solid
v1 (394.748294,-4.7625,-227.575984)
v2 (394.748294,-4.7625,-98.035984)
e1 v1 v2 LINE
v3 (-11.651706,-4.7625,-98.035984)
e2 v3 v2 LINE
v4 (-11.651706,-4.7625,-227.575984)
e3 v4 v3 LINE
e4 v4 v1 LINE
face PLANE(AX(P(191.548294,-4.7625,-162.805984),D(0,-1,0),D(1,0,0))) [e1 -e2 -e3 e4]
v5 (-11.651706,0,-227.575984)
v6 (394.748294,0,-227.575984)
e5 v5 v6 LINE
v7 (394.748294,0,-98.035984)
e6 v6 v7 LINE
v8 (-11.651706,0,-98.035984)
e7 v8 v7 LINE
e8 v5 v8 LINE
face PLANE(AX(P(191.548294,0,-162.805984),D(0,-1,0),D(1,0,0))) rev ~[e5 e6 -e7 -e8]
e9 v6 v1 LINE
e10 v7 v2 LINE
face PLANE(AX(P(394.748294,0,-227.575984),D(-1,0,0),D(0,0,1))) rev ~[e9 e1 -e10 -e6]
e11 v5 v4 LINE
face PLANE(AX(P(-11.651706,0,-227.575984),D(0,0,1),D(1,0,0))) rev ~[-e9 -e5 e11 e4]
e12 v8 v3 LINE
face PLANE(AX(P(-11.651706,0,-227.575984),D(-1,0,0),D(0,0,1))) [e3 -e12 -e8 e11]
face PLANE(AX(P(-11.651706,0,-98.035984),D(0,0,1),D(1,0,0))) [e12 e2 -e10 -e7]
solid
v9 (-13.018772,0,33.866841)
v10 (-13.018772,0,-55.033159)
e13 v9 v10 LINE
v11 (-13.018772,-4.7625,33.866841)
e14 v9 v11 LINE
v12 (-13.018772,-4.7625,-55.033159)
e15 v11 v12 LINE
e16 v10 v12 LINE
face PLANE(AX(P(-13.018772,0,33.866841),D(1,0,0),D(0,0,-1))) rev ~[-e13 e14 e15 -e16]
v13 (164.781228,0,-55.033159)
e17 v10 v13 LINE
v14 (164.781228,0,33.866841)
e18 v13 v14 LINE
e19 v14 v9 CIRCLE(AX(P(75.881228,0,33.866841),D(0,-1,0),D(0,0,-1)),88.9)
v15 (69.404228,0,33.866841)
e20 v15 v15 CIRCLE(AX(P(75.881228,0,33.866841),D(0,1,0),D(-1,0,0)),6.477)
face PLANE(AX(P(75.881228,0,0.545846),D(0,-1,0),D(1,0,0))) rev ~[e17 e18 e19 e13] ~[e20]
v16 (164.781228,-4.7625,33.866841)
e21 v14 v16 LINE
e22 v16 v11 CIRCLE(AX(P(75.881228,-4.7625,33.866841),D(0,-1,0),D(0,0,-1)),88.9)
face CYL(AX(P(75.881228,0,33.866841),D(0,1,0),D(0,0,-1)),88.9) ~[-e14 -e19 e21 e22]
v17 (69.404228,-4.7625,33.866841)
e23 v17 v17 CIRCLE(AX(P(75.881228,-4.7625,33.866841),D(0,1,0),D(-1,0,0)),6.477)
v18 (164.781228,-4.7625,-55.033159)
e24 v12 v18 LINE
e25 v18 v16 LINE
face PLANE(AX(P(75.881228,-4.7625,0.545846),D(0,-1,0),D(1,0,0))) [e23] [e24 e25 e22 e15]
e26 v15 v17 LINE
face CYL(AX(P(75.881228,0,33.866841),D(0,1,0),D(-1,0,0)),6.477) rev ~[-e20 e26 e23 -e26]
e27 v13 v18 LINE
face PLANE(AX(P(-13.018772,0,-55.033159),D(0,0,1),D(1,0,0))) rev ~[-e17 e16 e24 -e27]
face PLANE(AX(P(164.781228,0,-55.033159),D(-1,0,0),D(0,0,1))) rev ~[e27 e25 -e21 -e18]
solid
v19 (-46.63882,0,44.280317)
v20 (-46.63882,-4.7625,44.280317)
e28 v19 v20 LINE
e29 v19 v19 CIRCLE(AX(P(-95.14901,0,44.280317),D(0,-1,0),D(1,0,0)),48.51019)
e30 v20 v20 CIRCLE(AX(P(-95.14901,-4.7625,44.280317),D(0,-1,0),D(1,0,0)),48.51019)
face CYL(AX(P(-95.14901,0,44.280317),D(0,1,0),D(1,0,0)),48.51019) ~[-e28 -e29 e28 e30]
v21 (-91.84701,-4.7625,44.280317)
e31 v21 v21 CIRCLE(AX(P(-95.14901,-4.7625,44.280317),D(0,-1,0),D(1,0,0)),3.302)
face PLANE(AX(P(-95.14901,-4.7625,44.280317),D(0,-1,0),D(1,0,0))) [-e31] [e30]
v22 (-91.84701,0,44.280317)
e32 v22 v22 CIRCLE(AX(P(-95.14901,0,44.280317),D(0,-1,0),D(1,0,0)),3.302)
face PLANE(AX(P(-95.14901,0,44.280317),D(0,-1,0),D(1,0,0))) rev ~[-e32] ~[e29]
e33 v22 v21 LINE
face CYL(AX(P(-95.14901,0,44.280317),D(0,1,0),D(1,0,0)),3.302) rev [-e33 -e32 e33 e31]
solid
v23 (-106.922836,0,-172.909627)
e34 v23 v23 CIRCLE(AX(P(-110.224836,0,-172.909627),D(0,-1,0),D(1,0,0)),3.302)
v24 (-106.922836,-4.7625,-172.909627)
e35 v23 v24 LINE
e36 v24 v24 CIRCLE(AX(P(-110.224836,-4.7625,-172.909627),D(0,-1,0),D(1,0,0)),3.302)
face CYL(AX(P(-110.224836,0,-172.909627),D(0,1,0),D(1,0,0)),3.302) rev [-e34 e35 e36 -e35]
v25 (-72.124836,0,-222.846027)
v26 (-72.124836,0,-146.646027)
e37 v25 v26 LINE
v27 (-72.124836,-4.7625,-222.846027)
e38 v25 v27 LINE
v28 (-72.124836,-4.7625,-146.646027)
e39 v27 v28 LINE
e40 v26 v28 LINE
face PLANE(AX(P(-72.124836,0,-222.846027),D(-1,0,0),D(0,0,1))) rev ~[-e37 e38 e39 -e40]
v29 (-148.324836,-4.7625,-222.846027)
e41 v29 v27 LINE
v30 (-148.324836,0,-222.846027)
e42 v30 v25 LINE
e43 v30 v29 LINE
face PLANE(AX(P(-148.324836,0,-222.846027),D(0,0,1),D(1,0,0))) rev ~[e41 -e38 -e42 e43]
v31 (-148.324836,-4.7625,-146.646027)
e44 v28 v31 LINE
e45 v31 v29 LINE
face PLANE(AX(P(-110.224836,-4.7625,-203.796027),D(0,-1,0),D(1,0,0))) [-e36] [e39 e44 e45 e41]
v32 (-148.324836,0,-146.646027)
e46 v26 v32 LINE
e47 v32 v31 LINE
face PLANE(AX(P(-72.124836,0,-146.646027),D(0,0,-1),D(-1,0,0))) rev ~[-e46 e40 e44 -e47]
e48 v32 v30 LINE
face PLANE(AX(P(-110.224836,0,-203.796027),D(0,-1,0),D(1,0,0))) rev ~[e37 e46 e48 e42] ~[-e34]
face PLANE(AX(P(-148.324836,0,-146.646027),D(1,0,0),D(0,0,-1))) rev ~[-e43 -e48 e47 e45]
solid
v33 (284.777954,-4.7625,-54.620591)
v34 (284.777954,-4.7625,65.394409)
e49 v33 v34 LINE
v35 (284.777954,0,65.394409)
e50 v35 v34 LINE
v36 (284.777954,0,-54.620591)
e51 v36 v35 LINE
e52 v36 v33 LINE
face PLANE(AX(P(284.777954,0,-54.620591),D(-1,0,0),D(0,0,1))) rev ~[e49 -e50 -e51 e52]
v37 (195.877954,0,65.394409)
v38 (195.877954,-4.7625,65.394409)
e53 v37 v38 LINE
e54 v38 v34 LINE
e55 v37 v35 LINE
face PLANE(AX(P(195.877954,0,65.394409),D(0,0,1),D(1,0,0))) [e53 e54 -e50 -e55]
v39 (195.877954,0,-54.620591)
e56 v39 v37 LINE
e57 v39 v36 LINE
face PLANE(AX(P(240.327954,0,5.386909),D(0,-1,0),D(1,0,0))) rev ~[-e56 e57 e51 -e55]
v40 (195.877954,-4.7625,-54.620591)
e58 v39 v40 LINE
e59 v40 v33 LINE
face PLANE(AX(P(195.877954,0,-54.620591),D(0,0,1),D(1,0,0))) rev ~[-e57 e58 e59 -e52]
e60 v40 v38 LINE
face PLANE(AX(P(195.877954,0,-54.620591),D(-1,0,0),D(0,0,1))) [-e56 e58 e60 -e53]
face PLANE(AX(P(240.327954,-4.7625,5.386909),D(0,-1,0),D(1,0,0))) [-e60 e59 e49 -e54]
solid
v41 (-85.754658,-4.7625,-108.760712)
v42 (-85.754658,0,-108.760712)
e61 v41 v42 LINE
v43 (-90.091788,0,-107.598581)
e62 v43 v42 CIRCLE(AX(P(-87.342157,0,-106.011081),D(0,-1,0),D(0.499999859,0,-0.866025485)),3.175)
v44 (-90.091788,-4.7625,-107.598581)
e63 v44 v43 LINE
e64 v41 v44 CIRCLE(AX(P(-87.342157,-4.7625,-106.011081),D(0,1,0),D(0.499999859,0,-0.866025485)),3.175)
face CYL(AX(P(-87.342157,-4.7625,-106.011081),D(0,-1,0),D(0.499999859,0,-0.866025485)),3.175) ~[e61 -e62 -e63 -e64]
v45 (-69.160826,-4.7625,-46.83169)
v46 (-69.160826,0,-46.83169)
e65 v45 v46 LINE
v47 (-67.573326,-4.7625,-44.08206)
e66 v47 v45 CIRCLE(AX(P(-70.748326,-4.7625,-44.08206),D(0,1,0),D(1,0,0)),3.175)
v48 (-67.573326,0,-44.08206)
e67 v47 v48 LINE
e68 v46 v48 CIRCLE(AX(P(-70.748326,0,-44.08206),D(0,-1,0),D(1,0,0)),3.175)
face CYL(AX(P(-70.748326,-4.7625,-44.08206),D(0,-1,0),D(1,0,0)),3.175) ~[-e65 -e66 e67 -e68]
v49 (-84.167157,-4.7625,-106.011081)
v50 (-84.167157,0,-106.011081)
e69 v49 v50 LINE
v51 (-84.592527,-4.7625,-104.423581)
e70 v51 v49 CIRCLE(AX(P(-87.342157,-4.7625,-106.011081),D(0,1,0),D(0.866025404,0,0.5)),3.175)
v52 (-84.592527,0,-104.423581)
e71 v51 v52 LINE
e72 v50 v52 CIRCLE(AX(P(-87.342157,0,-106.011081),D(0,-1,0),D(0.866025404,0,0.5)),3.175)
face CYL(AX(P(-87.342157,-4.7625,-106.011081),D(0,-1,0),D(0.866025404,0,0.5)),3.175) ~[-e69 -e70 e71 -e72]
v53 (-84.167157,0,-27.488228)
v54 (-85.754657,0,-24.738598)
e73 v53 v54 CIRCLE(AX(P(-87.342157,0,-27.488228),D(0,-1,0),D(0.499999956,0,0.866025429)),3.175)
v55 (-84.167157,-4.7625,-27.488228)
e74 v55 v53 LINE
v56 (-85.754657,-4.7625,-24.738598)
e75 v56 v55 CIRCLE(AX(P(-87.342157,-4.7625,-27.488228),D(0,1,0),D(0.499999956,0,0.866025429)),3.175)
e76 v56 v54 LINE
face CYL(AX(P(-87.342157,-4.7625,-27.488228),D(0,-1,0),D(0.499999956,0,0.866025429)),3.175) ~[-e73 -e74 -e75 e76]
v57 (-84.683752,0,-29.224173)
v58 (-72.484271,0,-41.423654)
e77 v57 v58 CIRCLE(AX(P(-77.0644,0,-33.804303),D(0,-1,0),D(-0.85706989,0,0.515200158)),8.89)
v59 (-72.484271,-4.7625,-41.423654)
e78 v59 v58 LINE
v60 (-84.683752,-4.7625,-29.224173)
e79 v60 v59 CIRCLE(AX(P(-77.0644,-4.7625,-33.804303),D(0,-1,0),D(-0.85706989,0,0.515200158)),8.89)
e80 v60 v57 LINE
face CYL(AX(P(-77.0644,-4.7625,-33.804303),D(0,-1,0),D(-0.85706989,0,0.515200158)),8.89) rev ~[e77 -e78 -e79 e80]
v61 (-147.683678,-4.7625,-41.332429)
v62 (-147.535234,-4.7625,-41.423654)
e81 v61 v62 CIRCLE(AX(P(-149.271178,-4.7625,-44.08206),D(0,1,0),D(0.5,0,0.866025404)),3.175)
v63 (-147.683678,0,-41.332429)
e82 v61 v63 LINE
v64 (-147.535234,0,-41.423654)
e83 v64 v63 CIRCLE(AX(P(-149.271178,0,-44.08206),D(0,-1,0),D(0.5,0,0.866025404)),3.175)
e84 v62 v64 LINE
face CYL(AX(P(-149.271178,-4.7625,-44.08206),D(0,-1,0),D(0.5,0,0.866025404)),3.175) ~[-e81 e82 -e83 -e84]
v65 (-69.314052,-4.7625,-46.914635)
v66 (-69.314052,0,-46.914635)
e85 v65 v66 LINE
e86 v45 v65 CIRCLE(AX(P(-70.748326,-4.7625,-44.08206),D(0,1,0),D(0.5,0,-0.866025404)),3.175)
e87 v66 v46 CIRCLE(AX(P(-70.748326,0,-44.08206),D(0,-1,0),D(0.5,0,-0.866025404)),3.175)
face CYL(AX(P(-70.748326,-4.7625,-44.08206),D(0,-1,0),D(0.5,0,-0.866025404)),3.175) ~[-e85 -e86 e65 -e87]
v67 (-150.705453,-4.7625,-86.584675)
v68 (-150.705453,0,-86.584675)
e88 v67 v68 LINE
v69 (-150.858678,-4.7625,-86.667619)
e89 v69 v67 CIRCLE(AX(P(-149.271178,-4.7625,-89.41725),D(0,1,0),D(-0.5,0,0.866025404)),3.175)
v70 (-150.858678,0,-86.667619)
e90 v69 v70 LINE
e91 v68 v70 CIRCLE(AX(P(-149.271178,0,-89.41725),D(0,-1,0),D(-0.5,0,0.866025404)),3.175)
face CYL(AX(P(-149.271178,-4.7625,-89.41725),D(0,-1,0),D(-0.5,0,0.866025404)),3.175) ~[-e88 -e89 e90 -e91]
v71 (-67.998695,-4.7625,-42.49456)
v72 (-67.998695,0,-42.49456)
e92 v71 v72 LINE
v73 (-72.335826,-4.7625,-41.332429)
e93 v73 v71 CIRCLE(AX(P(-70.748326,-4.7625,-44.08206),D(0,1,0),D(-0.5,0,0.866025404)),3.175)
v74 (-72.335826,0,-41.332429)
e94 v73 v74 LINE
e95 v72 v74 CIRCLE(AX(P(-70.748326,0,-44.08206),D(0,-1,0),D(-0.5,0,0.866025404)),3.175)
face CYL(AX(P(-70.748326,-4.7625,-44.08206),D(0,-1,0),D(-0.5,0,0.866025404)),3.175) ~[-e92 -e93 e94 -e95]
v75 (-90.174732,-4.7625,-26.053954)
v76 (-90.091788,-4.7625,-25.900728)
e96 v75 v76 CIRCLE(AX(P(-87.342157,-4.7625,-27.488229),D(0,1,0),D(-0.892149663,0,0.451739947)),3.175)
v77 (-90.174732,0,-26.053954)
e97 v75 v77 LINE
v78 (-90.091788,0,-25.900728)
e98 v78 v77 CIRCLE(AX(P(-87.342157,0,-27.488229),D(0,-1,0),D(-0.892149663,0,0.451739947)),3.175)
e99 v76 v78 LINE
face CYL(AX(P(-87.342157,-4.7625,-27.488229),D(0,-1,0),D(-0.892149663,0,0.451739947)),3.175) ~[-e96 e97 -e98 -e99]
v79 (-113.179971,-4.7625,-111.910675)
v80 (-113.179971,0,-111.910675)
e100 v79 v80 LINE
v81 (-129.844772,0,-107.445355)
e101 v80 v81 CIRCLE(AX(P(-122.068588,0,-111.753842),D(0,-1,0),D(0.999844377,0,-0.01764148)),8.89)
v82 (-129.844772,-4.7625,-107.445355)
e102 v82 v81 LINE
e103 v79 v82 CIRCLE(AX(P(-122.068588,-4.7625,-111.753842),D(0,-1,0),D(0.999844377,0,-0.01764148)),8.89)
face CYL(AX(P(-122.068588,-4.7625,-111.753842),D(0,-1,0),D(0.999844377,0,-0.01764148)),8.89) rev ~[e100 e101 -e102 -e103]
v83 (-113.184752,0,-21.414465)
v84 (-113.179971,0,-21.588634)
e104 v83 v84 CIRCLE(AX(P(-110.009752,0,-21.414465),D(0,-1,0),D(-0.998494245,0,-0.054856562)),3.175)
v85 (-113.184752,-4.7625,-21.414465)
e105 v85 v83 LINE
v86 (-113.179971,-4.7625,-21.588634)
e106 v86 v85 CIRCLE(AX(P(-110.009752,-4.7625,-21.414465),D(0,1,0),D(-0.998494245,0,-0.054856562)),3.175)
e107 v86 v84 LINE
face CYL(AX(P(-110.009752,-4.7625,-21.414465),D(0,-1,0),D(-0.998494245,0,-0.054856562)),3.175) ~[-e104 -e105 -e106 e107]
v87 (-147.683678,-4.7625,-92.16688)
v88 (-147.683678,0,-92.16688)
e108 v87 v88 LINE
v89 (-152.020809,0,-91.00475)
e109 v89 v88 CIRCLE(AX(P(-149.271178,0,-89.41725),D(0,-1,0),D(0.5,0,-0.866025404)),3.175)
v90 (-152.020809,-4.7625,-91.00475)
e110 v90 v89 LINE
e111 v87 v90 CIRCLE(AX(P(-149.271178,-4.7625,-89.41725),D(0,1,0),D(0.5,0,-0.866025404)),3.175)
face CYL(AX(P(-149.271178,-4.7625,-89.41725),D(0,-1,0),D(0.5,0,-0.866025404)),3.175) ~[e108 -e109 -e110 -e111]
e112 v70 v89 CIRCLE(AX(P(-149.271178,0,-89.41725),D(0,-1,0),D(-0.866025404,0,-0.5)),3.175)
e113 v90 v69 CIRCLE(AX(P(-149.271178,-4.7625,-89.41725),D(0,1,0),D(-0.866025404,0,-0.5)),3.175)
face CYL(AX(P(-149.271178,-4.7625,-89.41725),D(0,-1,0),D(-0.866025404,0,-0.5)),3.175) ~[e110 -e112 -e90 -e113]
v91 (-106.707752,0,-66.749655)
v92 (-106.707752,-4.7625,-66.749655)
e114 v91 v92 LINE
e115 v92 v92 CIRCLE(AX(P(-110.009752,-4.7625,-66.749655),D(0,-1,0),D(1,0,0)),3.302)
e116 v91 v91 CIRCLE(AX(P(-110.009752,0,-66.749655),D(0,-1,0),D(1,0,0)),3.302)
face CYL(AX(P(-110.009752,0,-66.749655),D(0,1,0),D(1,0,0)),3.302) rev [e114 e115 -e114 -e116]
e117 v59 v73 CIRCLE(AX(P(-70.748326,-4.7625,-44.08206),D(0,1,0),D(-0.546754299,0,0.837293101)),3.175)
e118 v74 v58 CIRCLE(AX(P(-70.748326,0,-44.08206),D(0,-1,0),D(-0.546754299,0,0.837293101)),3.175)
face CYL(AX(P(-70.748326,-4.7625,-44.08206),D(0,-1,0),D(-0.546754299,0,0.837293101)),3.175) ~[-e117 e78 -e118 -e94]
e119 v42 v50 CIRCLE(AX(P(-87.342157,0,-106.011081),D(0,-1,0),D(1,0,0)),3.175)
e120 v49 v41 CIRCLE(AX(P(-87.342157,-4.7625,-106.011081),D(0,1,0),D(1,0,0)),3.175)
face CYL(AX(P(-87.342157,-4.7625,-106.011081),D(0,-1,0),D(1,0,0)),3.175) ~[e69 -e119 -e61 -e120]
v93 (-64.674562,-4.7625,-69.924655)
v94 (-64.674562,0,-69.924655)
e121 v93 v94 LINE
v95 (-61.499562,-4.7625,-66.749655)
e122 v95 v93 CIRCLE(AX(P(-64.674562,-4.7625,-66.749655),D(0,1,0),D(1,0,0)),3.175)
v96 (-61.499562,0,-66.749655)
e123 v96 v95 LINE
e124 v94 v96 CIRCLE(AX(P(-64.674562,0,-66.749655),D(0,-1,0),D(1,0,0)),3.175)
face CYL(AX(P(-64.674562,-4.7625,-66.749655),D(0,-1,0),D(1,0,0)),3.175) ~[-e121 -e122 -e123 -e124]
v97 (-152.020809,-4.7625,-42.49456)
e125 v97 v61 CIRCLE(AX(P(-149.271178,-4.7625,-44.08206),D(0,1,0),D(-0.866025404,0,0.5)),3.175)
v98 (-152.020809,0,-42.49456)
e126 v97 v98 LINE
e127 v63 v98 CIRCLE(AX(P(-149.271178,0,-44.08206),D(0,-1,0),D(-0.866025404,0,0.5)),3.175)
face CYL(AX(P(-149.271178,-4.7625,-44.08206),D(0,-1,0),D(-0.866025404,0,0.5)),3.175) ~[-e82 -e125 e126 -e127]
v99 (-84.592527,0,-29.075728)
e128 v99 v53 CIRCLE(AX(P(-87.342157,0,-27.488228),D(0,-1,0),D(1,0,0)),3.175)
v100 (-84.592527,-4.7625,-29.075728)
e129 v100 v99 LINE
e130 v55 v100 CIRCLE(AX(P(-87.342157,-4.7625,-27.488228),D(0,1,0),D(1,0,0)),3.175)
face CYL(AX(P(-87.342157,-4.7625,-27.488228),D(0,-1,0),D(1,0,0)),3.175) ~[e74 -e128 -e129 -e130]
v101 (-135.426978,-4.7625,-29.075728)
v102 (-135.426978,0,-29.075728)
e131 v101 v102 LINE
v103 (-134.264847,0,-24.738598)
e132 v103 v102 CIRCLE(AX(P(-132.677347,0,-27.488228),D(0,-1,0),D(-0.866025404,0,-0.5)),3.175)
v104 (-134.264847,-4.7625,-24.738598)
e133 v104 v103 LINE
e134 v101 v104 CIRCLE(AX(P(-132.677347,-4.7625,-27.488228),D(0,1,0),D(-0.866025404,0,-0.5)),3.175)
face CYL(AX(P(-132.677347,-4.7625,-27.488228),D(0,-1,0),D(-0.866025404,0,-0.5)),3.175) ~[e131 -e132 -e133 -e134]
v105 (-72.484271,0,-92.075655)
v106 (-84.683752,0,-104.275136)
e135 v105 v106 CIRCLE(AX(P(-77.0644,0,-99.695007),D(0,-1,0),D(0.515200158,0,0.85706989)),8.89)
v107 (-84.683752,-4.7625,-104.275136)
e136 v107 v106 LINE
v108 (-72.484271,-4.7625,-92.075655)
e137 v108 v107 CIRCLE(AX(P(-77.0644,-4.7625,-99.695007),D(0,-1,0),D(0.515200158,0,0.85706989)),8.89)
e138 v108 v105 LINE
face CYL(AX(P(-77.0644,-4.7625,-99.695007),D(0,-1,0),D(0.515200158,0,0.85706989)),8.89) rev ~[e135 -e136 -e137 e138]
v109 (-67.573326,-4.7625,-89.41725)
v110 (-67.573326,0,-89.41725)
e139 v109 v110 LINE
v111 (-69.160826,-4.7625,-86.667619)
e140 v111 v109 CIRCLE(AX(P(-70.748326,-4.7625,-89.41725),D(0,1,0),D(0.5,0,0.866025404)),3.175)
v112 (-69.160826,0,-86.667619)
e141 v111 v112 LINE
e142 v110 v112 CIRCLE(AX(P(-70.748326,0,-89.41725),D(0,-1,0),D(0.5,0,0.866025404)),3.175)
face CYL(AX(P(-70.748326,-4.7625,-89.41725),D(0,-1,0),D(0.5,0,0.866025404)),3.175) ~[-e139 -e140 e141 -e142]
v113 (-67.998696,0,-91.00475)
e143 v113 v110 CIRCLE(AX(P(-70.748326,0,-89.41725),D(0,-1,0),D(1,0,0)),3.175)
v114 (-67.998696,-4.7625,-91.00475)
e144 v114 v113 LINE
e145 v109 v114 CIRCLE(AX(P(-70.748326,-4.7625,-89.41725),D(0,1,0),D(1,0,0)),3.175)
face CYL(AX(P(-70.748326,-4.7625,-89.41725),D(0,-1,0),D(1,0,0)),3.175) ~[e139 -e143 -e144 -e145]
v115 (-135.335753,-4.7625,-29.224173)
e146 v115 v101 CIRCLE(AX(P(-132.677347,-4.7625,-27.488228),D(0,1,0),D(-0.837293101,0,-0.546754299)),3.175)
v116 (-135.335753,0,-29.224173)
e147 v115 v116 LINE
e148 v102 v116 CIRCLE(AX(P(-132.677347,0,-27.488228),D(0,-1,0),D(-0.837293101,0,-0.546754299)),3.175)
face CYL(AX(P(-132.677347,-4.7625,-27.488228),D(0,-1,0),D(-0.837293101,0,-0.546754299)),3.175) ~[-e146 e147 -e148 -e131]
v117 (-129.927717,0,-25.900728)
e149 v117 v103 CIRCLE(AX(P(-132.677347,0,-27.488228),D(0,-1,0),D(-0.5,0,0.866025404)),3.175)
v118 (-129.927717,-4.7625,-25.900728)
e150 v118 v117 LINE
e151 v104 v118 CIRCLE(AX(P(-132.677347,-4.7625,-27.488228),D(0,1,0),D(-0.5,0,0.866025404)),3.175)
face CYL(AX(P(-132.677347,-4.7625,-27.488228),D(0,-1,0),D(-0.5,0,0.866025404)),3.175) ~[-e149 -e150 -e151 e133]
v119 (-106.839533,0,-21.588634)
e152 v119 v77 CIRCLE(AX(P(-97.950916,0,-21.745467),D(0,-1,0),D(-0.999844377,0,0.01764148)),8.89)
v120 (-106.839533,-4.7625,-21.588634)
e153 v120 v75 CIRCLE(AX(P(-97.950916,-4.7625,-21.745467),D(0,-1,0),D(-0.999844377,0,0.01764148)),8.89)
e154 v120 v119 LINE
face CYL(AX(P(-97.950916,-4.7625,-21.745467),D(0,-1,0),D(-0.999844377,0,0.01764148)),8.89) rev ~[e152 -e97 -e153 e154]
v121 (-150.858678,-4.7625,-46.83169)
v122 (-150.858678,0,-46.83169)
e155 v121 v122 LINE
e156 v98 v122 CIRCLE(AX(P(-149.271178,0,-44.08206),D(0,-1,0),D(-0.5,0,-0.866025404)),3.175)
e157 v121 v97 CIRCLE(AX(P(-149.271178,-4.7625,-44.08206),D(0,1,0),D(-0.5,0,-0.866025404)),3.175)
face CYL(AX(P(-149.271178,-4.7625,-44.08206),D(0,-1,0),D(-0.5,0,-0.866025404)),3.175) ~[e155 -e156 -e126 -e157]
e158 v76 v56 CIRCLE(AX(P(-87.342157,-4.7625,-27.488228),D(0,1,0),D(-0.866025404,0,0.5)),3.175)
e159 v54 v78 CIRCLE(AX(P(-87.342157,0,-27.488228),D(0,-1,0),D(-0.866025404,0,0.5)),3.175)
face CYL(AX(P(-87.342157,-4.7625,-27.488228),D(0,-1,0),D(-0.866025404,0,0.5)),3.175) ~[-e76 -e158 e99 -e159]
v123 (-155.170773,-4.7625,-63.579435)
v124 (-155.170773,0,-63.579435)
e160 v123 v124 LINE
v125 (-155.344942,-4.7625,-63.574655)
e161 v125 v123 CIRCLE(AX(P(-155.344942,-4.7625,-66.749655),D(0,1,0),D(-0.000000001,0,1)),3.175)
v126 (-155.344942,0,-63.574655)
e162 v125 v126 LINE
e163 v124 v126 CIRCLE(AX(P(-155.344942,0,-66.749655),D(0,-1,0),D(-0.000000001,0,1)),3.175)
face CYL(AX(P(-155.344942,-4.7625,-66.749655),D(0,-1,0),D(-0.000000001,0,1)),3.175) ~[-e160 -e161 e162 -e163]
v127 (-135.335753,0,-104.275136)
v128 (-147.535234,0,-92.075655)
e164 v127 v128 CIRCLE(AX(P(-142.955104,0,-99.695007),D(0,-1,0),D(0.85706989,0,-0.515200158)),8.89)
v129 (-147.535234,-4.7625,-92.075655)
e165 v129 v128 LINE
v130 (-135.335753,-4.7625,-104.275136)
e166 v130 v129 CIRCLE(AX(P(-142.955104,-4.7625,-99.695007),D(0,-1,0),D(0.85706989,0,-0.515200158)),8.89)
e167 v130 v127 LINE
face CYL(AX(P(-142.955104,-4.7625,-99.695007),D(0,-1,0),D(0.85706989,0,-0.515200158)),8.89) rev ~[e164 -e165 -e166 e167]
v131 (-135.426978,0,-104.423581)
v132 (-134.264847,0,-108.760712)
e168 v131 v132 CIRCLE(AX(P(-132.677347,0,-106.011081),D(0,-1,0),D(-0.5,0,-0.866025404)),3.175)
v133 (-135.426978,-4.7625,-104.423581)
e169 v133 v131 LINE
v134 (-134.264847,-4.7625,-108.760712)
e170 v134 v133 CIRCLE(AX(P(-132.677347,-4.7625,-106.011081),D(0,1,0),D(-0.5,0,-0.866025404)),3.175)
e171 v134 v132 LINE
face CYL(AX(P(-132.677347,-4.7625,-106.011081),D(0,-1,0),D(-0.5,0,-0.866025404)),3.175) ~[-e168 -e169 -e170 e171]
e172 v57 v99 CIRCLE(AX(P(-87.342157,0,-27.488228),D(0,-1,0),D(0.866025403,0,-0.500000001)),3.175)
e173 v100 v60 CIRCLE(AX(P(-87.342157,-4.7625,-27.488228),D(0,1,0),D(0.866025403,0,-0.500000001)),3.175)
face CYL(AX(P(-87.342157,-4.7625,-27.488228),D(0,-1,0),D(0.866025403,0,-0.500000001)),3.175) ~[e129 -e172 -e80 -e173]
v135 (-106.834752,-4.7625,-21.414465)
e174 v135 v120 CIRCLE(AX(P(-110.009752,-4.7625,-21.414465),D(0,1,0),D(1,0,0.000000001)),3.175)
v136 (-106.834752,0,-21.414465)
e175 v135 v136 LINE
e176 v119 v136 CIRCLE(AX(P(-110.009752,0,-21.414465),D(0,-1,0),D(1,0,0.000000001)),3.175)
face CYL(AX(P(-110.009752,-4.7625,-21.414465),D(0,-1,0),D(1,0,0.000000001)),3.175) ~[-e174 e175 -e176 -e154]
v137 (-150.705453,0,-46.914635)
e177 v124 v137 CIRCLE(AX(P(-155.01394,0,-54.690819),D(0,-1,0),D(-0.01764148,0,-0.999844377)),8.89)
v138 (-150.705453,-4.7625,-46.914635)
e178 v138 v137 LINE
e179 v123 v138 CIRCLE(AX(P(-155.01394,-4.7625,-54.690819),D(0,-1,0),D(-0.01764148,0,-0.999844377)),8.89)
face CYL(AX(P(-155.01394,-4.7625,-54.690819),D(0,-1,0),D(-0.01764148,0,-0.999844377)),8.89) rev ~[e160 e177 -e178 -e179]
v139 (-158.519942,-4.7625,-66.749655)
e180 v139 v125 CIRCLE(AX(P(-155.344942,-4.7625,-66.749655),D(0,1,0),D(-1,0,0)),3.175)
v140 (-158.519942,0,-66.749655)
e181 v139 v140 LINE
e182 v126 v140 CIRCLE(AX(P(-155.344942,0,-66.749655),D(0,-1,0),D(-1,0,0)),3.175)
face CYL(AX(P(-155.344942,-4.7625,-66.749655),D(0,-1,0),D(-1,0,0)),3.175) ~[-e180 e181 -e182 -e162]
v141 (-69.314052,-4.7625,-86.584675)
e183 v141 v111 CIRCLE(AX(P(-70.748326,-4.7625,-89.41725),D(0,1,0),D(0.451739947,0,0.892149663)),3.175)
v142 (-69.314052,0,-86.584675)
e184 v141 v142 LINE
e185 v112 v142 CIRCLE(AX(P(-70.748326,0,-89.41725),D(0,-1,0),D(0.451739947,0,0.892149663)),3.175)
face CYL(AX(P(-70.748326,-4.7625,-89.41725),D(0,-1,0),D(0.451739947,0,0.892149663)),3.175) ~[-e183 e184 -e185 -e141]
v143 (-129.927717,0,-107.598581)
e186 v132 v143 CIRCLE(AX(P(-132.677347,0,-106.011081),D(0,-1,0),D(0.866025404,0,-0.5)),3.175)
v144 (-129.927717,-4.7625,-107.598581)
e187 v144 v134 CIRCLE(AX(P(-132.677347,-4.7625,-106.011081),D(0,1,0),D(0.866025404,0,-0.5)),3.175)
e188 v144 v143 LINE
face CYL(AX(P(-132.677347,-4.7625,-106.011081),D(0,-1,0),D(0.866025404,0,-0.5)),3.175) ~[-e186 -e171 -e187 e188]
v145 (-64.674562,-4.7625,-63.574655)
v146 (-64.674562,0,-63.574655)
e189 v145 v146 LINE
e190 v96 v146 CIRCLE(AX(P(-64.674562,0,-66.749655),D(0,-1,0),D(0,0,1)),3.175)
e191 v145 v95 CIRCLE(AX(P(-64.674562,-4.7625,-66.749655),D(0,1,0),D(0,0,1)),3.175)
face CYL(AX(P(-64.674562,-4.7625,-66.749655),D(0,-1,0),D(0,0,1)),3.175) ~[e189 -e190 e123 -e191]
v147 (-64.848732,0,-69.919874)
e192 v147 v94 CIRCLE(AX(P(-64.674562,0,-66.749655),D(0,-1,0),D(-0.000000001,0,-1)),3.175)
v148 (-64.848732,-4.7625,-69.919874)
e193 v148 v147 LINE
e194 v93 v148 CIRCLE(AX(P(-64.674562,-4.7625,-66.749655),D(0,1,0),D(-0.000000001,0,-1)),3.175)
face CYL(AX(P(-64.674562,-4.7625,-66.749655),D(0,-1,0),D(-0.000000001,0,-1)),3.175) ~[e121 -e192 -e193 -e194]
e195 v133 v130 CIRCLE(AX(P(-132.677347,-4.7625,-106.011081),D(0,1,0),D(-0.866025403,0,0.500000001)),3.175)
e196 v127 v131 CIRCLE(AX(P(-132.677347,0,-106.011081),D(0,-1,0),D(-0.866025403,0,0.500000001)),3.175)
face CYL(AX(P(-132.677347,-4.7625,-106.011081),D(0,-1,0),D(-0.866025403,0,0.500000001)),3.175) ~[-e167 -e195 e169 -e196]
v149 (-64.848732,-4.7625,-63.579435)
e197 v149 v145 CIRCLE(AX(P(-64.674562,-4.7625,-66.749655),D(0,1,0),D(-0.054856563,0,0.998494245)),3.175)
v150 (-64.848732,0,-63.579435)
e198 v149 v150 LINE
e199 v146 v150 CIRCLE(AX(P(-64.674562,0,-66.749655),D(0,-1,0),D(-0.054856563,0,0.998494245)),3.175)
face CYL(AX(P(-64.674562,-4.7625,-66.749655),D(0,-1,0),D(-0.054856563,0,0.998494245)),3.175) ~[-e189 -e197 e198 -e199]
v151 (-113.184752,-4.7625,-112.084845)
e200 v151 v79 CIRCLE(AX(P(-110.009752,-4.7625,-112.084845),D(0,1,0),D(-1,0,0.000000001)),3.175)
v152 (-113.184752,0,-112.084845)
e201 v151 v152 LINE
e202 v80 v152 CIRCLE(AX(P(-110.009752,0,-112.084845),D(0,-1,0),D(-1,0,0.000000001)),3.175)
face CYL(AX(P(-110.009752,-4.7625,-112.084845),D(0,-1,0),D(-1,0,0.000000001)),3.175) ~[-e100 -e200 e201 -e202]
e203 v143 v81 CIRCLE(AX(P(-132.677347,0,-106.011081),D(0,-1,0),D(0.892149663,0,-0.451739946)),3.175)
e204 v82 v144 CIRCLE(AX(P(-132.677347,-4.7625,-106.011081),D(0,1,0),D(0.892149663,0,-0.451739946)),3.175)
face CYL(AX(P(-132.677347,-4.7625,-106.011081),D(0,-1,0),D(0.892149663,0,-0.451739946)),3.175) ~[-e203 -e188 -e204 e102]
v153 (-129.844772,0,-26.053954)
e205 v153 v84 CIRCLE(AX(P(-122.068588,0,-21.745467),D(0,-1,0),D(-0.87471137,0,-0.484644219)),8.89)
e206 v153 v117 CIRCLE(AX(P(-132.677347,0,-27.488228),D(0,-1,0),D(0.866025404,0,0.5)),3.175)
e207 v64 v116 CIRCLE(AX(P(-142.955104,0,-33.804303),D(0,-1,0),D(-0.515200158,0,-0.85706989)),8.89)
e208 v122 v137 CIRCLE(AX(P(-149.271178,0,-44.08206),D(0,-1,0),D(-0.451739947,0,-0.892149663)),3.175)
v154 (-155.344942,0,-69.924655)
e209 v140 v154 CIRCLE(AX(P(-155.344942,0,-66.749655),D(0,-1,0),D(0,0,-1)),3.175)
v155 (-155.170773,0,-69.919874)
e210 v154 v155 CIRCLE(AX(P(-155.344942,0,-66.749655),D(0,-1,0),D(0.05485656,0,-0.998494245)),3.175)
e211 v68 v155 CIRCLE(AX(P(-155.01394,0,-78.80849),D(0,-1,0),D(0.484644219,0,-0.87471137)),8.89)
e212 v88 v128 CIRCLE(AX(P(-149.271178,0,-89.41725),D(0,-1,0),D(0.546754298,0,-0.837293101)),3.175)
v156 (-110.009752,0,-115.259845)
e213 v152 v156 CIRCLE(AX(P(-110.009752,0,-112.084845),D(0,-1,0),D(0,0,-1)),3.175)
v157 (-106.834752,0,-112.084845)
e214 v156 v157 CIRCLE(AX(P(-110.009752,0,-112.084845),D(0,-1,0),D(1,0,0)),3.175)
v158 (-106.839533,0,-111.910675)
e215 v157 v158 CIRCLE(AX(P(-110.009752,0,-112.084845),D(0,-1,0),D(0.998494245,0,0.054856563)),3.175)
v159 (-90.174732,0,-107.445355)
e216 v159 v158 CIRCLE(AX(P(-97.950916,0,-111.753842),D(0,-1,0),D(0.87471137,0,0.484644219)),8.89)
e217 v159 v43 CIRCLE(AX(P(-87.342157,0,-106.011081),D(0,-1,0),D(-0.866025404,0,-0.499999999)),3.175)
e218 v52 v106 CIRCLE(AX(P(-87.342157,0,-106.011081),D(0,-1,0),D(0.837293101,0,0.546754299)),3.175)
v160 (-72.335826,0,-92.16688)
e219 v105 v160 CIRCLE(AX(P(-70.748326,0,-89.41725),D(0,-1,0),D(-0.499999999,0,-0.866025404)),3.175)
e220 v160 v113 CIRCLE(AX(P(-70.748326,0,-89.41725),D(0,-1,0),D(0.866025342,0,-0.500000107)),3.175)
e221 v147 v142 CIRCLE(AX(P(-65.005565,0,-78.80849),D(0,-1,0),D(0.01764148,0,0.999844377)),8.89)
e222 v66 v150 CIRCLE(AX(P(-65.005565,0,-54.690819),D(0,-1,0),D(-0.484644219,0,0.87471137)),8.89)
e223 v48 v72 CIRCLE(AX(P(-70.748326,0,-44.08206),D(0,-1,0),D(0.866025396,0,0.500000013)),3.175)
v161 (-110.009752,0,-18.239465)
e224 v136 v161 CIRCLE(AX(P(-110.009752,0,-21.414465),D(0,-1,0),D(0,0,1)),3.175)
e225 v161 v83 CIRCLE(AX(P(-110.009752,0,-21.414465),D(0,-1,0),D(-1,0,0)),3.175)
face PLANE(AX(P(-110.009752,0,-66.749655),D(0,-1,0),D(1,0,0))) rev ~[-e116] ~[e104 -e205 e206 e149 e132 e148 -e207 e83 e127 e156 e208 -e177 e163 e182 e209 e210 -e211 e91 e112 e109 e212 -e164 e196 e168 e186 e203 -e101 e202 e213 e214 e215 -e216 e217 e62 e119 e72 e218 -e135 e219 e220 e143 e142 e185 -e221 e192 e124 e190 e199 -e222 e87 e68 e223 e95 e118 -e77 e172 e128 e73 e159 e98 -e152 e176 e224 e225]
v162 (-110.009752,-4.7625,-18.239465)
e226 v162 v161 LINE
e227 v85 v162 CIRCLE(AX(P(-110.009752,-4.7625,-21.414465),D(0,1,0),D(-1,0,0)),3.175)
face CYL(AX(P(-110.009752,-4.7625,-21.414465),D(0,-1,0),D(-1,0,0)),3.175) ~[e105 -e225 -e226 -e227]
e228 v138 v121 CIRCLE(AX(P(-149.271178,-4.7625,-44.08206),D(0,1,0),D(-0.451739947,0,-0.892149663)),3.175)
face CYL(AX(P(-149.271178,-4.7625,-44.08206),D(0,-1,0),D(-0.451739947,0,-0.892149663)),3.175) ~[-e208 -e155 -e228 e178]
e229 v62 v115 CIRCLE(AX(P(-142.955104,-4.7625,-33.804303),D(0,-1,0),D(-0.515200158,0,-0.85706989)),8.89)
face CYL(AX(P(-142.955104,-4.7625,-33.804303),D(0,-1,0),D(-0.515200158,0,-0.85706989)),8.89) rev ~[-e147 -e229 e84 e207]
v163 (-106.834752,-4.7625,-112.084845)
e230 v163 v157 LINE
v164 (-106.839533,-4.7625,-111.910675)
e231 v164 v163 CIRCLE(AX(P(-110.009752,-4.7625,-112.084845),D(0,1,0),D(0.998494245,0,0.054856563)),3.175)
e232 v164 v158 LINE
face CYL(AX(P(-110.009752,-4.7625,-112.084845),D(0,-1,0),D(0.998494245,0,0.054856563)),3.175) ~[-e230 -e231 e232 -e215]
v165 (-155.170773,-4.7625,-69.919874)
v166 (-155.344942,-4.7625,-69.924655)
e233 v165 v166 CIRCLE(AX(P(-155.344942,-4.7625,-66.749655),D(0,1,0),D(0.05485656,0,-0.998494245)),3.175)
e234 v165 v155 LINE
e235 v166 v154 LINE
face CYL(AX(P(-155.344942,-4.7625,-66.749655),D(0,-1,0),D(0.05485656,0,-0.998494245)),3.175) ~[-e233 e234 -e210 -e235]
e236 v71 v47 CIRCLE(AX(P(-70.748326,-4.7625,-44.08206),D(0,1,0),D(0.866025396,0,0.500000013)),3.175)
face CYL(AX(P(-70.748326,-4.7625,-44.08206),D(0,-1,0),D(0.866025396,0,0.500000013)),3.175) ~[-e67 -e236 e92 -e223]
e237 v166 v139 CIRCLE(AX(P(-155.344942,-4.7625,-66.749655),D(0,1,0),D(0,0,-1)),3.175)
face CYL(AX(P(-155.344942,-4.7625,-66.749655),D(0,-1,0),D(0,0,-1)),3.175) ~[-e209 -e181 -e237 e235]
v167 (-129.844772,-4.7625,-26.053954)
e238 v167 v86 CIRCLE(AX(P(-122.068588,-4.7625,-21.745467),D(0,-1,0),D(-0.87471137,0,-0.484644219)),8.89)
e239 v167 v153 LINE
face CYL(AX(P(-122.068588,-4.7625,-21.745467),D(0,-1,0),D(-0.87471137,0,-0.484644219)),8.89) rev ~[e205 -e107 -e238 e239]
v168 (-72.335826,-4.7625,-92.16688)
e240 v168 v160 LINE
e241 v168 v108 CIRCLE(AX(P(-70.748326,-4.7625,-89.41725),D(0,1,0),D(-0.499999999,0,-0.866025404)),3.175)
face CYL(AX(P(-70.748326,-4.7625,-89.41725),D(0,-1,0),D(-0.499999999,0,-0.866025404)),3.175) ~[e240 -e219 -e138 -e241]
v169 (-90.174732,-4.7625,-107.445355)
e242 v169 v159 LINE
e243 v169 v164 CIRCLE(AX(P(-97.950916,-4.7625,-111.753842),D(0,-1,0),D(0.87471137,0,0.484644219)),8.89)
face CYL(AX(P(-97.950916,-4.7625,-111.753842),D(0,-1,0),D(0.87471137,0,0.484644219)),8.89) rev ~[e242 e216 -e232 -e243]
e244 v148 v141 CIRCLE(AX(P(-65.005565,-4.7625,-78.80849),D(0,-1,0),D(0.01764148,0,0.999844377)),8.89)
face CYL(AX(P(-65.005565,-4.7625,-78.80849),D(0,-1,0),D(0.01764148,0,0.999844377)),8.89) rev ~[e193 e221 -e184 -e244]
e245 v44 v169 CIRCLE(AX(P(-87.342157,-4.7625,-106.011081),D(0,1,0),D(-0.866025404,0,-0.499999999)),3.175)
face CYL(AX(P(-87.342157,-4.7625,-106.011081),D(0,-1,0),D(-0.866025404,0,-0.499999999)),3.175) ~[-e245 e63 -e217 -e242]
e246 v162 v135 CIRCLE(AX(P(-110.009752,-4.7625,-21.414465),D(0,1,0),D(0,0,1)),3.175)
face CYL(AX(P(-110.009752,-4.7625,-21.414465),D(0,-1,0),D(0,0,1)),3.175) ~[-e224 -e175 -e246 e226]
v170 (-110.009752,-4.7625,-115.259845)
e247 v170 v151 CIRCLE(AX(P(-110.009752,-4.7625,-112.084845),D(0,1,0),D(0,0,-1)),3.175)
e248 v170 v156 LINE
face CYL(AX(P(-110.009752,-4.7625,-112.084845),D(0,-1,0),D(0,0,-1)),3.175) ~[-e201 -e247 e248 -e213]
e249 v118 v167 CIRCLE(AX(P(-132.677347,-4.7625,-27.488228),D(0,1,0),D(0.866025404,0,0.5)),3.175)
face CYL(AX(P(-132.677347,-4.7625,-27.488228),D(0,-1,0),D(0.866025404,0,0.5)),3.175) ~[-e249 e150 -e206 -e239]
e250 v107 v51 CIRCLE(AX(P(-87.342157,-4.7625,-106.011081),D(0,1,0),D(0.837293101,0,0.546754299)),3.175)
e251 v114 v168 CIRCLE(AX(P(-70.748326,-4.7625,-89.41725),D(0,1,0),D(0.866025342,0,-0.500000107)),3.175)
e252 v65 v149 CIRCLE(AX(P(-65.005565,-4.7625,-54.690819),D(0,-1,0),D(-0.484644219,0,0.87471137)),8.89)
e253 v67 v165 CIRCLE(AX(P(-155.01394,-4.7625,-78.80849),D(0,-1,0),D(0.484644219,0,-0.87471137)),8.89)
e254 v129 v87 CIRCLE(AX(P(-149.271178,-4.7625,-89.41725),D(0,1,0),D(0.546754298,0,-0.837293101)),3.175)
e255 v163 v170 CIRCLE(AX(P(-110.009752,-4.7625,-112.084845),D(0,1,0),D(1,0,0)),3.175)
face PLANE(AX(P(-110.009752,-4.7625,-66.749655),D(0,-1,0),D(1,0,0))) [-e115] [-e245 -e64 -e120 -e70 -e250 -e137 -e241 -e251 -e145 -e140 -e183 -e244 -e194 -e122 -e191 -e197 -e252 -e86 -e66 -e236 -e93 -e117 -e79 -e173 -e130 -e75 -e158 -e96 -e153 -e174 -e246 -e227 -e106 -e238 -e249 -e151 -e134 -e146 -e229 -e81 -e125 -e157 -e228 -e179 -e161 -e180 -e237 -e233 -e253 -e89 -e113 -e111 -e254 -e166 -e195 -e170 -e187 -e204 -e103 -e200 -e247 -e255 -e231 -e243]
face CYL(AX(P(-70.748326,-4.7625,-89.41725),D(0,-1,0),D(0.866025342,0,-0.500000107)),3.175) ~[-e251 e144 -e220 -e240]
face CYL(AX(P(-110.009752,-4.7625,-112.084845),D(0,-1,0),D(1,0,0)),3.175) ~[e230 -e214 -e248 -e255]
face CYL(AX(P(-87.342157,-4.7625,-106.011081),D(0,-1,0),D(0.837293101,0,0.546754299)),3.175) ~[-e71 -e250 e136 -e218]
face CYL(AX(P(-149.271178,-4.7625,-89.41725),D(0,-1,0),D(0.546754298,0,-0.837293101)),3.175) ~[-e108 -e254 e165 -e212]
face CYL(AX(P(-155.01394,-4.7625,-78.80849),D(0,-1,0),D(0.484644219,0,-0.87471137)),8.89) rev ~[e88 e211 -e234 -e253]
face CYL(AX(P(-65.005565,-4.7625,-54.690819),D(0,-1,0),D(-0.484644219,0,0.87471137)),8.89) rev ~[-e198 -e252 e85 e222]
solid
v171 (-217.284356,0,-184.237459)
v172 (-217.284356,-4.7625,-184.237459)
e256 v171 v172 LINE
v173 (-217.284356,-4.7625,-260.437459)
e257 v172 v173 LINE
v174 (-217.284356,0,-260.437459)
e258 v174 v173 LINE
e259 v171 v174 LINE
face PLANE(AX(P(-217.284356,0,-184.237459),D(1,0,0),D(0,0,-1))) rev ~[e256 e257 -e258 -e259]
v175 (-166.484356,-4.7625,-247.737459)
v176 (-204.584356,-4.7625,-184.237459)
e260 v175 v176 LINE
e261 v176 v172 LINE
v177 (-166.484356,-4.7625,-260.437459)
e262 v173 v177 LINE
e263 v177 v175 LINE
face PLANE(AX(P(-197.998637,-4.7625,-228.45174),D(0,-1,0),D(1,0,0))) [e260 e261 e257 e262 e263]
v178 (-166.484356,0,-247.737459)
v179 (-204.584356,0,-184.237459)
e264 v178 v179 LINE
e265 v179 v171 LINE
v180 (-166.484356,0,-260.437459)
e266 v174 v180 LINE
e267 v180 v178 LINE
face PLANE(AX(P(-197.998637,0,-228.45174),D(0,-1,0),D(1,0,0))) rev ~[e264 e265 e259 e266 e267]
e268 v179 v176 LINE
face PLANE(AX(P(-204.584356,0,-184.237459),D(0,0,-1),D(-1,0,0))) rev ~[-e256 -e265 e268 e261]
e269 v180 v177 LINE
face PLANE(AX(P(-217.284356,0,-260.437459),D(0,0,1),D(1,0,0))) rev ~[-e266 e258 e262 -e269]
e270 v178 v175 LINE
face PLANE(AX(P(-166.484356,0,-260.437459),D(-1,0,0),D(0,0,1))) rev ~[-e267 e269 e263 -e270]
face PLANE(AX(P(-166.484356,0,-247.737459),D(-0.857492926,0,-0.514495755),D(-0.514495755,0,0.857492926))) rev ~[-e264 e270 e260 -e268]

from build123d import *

# Parameters (mm, degrees)
F0_R      = 48.51019
F0_R_2    = 3.302
F1_DEPTH  = 4.7625
F3_DEPTH  = 4.7635
F5_DEPTH  = 4.7625
F6_W      = 406.4
F6_H      = 129.54
F7_DEPTH  = 4.7625
F8_W      = 88.9
F8_H      = 120.015
F9_DEPTH  = 4.7625
F10_W     = 76.2
F10_H     = 38.1
F10_R     = 3.302
F11_DEPTH = 4.7625
F13_DEPTH = 4.7625


with BuildPart() as f1:
    # F0 (on Front) → F1 (new body)
    with BuildSketch(Plane.XZ):
        with Locations((-95.1490104198, 44.2803166807)):
            Circle(F0_R)
        with Locations((-95.1490104198, 44.2803166807)):
            Circle(F0_R_2, mode=Mode.SUBTRACT)
    extrude(amount=F1_DEPTH)


with BuildPart() as f1b:
    # F0 (on Front) → F1, piece 2 (new body)
    with BuildSketch(Plane.XZ):
        with Locations((-110.009752214, -66.7496547103)):
            Circle(F0_R)
        with Locations((-110.009752214, -66.7496547103)):
            Circle(F0_R_2, mode=Mode.SUBTRACT)
    extrude(amount=F1_DEPTH)

    # F2 (on face) → F3 (cut, through all)
    with BuildSketch(Plane.XZ.offset(4.7625)):
        with BuildLine():
            ThreePointArc((-113.184752214, -21.4144647103), (-112.2548162442, -19.16940068), (-110.009752214, -18.2394647103))
            ThreePointArc((-110.009752214, -18.2394647103), (-122.5651132675, -19.8924093511), (-134.264847214, -24.7385978279))
            ThreePointArc((-134.264847214, -24.7385978279), (-131.8555967458, -24.4214139864), (-129.9277165569, -25.9007284849))
            ThreePointArc((-129.9277165569, -25.9007284849), (-129.8851930229, -25.9767722422), (-129.8447720346, -26.0539541551))
            ThreePointArc((-129.8447720346, -26.0539541551), (-119.7676866428, -30.332547645), (-113.1799714423, -21.5886342944))
            ThreePointArc((-113.1799714423, -21.5886342944), (-113.183556796, -21.501582303), (-113.184752214, -21.4144647103))
        make_face()
        with BuildLine():
            ThreePointArc((-85.7546573537, -24.7385977472), (-97.4543912383, -19.8924093302), (-110.009752214, -18.2394647103))
            ThreePointArc((-110.009752214, -18.2394647103), (-107.7646881837, -19.16940068), (-106.834752214, -21.4144647103))
            ThreePointArc((-106.834752214, -21.4144647103), (-106.8359476319, -21.501582303), (-106.8395329856, -21.5886342944))
            ThreePointArc((-106.8395329856, -21.5886342944), (-100.2518177851, -30.332547645), (-90.1747323934, -26.0539541551))
            ThreePointArc((-90.1747323934, -26.0539541551), (-90.134311405, -25.9767722422), (-90.091787871, -25.9007284849))
            ThreePointArc((-90.091787871, -25.9007284849), (-88.1639077601, -24.4214140073), (-85.7546573537, -24.7385977472))
        make_face()
        with BuildLine():
            ThreePointArc((-135.426977871, -29.0757284849), (-135.7441617124, -26.6664780167), (-134.264847214, -24.7385978279))
            ThreePointArc((-134.264847214, -24.7385978279), (-144.3116365196, -32.4477704046), (-152.0208090964, -42.4945597103))
            ThreePointArc((-152.0208090964, -42.4945597103), (-150.0929289075, -41.0152452118), (-147.6836784393, -41.3324290533))
            ThreePointArc((-147.6836784393, -41.3324290533), (-147.6088301, -41.3770231119), (-147.5352335407, -41.423654115))
            ThreePointArc((-147.5352335407, -41.423654115), (-136.6689248504, -40.0904820738), (-135.3357528092, -29.2241733835))
            ThreePointArc((-135.3357528092, -29.2241733835), (-135.3823838123, -29.1505768243), (-135.426977871, -29.0757284849))
        make_face()
        with BuildLine():
            ThreePointArc((-67.9986953552, -42.4945596694), (-75.7078679821, -32.4477703309), (-85.7546573537, -24.7385977472))
            ThreePointArc((-85.7546573537, -24.7385977472), (-84.5925265973, -25.900728415), (-84.167157214, -27.4882284849))
            ThreePointArc((-84.167157214, -27.4882284849), (-84.2753427155, -28.3099789531), (-84.5925265569, -29.0757284849))
            ThreePointArc((-84.5925265569, -29.0757284849), (-84.6371206156, -29.1505768243), (-84.6837516187, -29.2241733835))
            ThreePointArc((-84.6837516187, -29.2241733835), (-83.3505795775, -40.0904820738), (-72.4842708872, -41.423654115))
            ThreePointArc((-72.4842708872, -41.423654115), (-72.410674328, -41.3770231119), (-72.3358259886, -41.3324290533))
            ThreePointArc((-72.3358259886, -41.3324290533), (-69.9265755432, -41.0152452057), (-67.9986953552, -42.4945596694))
        make_face()
        with BuildLine():
            ThreePointArc((-150.8586784393, -46.8316903673), (-152.3379929378, -44.9038101785), (-152.0208090964, -42.4945597103))
            ThreePointArc((-152.0208090964, -42.4945597103), (-156.8669975731, -54.1942936568), (-158.519942214, -66.7496547103))
            ThreePointArc((-158.519942214, -66.7496547103), (-157.5900062442, -64.50459068), (-155.344942214, -63.5746547103))
            ThreePointArc((-155.344942214, -63.5746547103), (-155.2578246213, -63.5758501282), (-155.1707726298, -63.5794354819))
            ThreePointArc((-155.1707726298, -63.5794354819), (-146.4268592793, -56.9917202815), (-150.7054527691, -46.9146348897))
            ThreePointArc((-150.7054527691, -46.9146348897), (-150.782634682, -46.8742139013), (-150.8586784393, -46.8316903673))
        make_face()
        with BuildLine():
            ThreePointArc((-61.499562214, -66.7496547103), (-63.1525068609, -54.1942936339), (-67.9986953552, -42.4945596694))
            ThreePointArc((-67.9986953552, -42.4945596694), (-67.6815114962, -43.2603092193), (-67.5733259886, -44.0820597103))
            ThreePointArc((-67.5733259886, -44.0820597103), (-67.9986953315, -45.6695597103), (-69.1608259886, -46.8316903673))
            ThreePointArc((-69.1608259886, -46.8316903673), (-69.2368697459, -46.8742139013), (-69.3140516588, -46.9146348897))
            ThreePointArc((-69.3140516588, -46.9146348897), (-73.5926451486, -56.9917202815), (-64.8487317981, -63.5794354819))
            ThreePointArc((-64.8487317981, -63.5794354819), (-64.7616798066, -63.5758501282), (-64.674562214, -63.5746547103))
            ThreePointArc((-64.674562214, -63.5746547103), (-62.4294981837, -64.50459068), (-61.499562214, -66.7496547103))
        make_face()
        with BuildLine():
            ThreePointArc((-155.344942214, -69.9246547103), (-157.5900062442, -68.9947187406), (-158.519942214, -66.7496547103))
            ThreePointArc((-158.519942214, -66.7496547103), (-156.8669975731, -79.3050157638), (-152.0208090964, -91.0047497103))
            ThreePointArc((-152.0208090964, -91.0047497103), (-152.3379929378, -88.5954992421), (-150.8586784393, -86.6676190533))
            ThreePointArc((-150.8586784393, -86.6676190533), (-150.782634682, -86.6250955193), (-150.7054527691, -86.5846745309))
            ThreePointArc((-150.7054527691, -86.5846745309), (-146.4268592793, -76.5075891391), (-155.1707726298, -69.9198739387))
            ThreePointArc((-155.1707726298, -69.9198739387), (-155.2578246213, -69.9234592923), (-155.344942214, -69.9246547103))
        make_face()
        with BuildLine():
            ThreePointArc((-67.9986955276, -91.0047500499), (-63.1525069055, -79.3050159532), (-61.499562214, -66.7496547103))
            ThreePointArc((-61.499562214, -66.7496547103), (-62.4294981837, -68.9947187406), (-64.674562214, -69.9246547103))
            ThreePointArc((-64.674562214, -69.9246547103), (-64.7616798066, -69.9234592923), (-64.8487317981, -69.9198739387))
            ThreePointArc((-64.8487317981, -69.9198739387), (-73.5926451486, -76.5075891391), (-69.3140516588, -86.5846745309))
            ThreePointArc((-69.3140516588, -86.5846745309), (-69.2368697459, -86.6250955193), (-69.1608259886, -86.6676190533))
            ThreePointArc((-69.1608259886, -86.6676190533), (-67.9986953315, -87.8297497103), (-67.5733259886, -89.4172497103))
            ThreePointArc((-67.5733259886, -89.4172497103), (-67.6815115408, -90.2390003679), (-67.9986955276, -91.0047500499))
        make_face()
        with BuildLine():
            ThreePointArc((-147.6836784393, -92.1668803673), (-150.0929289075, -92.4840642088), (-152.0208090964, -91.0047497103))
            ThreePointArc((-152.0208090964, -91.0047497103), (-144.3116365196, -101.0515390159), (-134.264847214, -108.7607115927))
            ThreePointArc((-134.264847214, -108.7607115927), (-135.7441617124, -106.8328314039), (-135.426977871, -104.4235809357))
            ThreePointArc((-135.426977871, -104.4235809357), (-135.3823838123, -104.3487325963), (-135.3357528092, -104.2751360371))
            ThreePointArc((-135.3357528092, -104.2751360371), (-136.6689248504, -93.4088273468), (-147.5352335407, -92.0756553056))
            ThreePointArc((-147.5352335407, -92.0756553056), (-147.6088301, -92.1222863087), (-147.6836784393, -92.1668803673))
        make_face()
        with BuildLine():
            ThreePointArc((-85.7546576608, -108.7607118507), (-75.7078682294, -101.051539337), (-67.9986955276, -91.0047500499))
            ThreePointArc((-67.9986955276, -91.0047500499), (-69.9265757098, -92.4840642595), (-72.3358259886, -92.1668803673))
            ThreePointArc((-72.3358259886, -92.1668803673), (-72.410674328, -92.1222863087), (-72.4842708872, -92.0756553056))
            ThreePointArc((-72.4842708872, -92.0756553056), (-83.3505795775, -93.4088273468), (-84.6837516187, -104.2751360371))
            ThreePointArc((-84.6837516187, -104.2751360371), (-84.6371206156, -104.3487325963), (-84.5925265569, -104.4235809357))
            ThreePointArc((-84.5925265569, -104.4235809357), (-84.2753427155, -105.1893304675), (-84.167157214, -106.0110809357))
            ThreePointArc((-84.167157214, -106.0110809357), (-84.5925266859, -107.5985811591), (-85.7546576608, -108.7607118507))
        make_face()
        with BuildLine():
            ThreePointArc((-129.9277165569, -107.5985809357), (-131.8555967458, -109.0778954342), (-134.264847214, -108.7607115927))
            ThreePointArc((-134.264847214, -108.7607115927), (-122.5651132675, -113.6069000695), (-110.009752214, -115.2598447103))
            ThreePointArc((-110.009752214, -115.2598447103), (-112.2548162442, -114.3299087406), (-113.184752214, -112.0848447103))
            ThreePointArc((-113.184752214, -112.0848447103), (-113.183556796, -111.9977271176), (-113.1799714423, -111.9106751262))
            ThreePointArc((-113.1799714423, -111.9106751262), (-119.7676866428, -103.1667617756), (-129.8447720346, -107.4453552655))
            ThreePointArc((-129.8447720346, -107.4453552655), (-129.8851930229, -107.5225371783), (-129.9277165569, -107.5985809357))
        make_face()
        with BuildLine():
            ThreePointArc((-110.009752214, -115.2598447103), (-97.4543914096, -113.6069001363), (-85.7546576608, -108.7607118507))
            ThreePointArc((-85.7546576608, -108.7607118507), (-88.1639079314, -109.0778953674), (-90.091787871, -107.5985809357))
            ThreePointArc((-90.091787871, -107.5985809357), (-90.134311405, -107.5225371783), (-90.1747323934, -107.4453552655))
            ThreePointArc((-90.1747323934, -107.4453552655), (-100.2518177851, -103.1667617756), (-106.8395329856, -111.9106751262))
            ThreePointArc((-106.8395329856, -111.9106751262), (-106.8359476319, -111.9977271176), (-106.834752214, -112.0848447103))
            ThreePointArc((-106.834752214, -112.0848447103), (-107.7646881837, -114.3299087406), (-110.009752214, -115.2598447103))
        make_face()
    extrude(amount=-F3_DEPTH, mode=Mode.SUBTRACT)


with BuildPart() as f5:
    # F4 (on Front) → F5 (new body)
    with BuildSketch(Plane.XZ):
        with BuildLine():
            ThreePointArc((75.8812278509, -55.033158654), (138.7430206984, -28.9949515015), (164.7812278509, 33.866841346))
            Line((164.7812278509, 33.866841346), (82.3582278509, 33.866841346))
            ThreePointArc((82.3582278509, 33.866841346), (75.8812278509, 27.389841346), (69.4042278509, 33.866841346))
            Line((69.4042278509, 33.866841346), (-13.0187721491, 33.866841346))
            ThreePointArc((-13.0187721491, 33.866841346), (13.0194350034, -28.9949515015), (75.8812278509, -55.033158654))
        make_face()
        with BuildLine():
            Line((82.3582278509, 33.866841346), (164.7812278509, 33.866841346))
            ThreePointArc((164.7812278509, 33.866841346), (75.8812278509, 122.766841346), (-13.0187721491, 33.866841346))
            Line((-13.0187721491, 33.866841346), (69.4042278509, 33.866841346))
            ThreePointArc((69.4042278509, 33.866841346), (75.8812278509, 40.343841346), (82.3582278509, 33.866841346))
        make_face()
        with BuildLine():
            ThreePointArc((75.8812278509, -55.033158654), (13.0194350034, -28.9949515015), (-13.0187721491, 33.866841346))
            Line((-13.0187721491, 33.866841346), (-13.0187721491, -55.033158654))
            Line((-13.0187721491, -55.033158654), (75.8812278509, -55.033158654))
        make_face()
        with BuildLine():
            Line((164.7812278509, -55.033158654), (164.7812278509, 33.866841346))
            ThreePointArc((164.7812278509, 33.866841346), (138.7430206984, -28.9949515015), (75.8812278509, -55.033158654))
            Line((75.8812278509, -55.033158654), (164.7812278509, -55.033158654))
        make_face()
    extrude(amount=F5_DEPTH)


with BuildPart() as f7:
    # F6 (on Front) → F7 (new body)
    with BuildSketch(Plane.XZ):
        with Locations((191.5482940495, -162.8059837413)):
            Rectangle(F6_W, F6_H)
    extrude(amount=F7_DEPTH)


with BuildPart() as f9:
    # F8 (on Front) → F9 (new body)
    with BuildSketch(Plane.XZ):
        with Locations((240.3279543638, 5.3869090009)):
            Rectangle(F8_W, F8_H)
    extrude(amount=F9_DEPTH)


with BuildPart() as f11:
    # F10 (on Front) → F11 (new body)
    with BuildSketch(Plane.XZ):
        with Locations((-110.2248355746, -203.7960269928)):
            Rectangle(F10_W, F10_H)
        with BuildLine():
            Line((-148.3248355746, -146.6460269928), (-148.3248355746, -184.7460269928))
            ThreePointArc((-148.3248355746, -184.7460269928), (-137.1656039378, -157.8052586296), (-110.2248355746, -146.6460269928))
            Line((-110.2248355746, -146.6460269928), (-148.3248355746, -146.6460269928))
        make_face()
        with BuildLine():
            ThreePointArc((-110.2248355746, -146.6460269928), (-137.1656039378, -157.8052586296), (-148.3248355746, -184.7460269928))
            Line((-148.3248355746, -184.7460269928), (-72.1248355746, -184.7460269928))
            ThreePointArc((-72.1248355746, -184.7460269928), (-83.2840672114, -157.8052586296), (-110.2248355746, -146.6460269928))
        make_face()
        with Locations((-110.2248355746, -172.9096269928)):
            Circle(F10_R, mode=Mode.SUBTRACT)
        with BuildLine():
            ThreePointArc((-110.2248355746, -146.6460269928), (-83.2840672114, -157.8052586296), (-72.1248355746, -184.7460269928))
            Line((-72.1248355746, -184.7460269928), (-72.1248355746, -146.6460269928))
            Line((-72.1248355746, -146.6460269928), (-110.2248355746, -146.6460269928))
        make_face()
    extrude(amount=F11_DEPTH)


with BuildPart() as f13:
    # F12 (on Front) → F13 (new body)
    with BuildSketch(Plane.XZ):
        Polygon((-217.2843559265, -184.2374587536), (-217.2843559265, -260.4374587536), (-166.4843559265, -260.4374587536), (-166.4843559265, -247.7374587536), (-204.5843559265, -184.2374587536), align=None)
    extrude(amount=F13_DEPTH)


solid = Compound([f1.part, f1b.part, f5.part, f7.part, f9.part, f11.part, f13.part])
